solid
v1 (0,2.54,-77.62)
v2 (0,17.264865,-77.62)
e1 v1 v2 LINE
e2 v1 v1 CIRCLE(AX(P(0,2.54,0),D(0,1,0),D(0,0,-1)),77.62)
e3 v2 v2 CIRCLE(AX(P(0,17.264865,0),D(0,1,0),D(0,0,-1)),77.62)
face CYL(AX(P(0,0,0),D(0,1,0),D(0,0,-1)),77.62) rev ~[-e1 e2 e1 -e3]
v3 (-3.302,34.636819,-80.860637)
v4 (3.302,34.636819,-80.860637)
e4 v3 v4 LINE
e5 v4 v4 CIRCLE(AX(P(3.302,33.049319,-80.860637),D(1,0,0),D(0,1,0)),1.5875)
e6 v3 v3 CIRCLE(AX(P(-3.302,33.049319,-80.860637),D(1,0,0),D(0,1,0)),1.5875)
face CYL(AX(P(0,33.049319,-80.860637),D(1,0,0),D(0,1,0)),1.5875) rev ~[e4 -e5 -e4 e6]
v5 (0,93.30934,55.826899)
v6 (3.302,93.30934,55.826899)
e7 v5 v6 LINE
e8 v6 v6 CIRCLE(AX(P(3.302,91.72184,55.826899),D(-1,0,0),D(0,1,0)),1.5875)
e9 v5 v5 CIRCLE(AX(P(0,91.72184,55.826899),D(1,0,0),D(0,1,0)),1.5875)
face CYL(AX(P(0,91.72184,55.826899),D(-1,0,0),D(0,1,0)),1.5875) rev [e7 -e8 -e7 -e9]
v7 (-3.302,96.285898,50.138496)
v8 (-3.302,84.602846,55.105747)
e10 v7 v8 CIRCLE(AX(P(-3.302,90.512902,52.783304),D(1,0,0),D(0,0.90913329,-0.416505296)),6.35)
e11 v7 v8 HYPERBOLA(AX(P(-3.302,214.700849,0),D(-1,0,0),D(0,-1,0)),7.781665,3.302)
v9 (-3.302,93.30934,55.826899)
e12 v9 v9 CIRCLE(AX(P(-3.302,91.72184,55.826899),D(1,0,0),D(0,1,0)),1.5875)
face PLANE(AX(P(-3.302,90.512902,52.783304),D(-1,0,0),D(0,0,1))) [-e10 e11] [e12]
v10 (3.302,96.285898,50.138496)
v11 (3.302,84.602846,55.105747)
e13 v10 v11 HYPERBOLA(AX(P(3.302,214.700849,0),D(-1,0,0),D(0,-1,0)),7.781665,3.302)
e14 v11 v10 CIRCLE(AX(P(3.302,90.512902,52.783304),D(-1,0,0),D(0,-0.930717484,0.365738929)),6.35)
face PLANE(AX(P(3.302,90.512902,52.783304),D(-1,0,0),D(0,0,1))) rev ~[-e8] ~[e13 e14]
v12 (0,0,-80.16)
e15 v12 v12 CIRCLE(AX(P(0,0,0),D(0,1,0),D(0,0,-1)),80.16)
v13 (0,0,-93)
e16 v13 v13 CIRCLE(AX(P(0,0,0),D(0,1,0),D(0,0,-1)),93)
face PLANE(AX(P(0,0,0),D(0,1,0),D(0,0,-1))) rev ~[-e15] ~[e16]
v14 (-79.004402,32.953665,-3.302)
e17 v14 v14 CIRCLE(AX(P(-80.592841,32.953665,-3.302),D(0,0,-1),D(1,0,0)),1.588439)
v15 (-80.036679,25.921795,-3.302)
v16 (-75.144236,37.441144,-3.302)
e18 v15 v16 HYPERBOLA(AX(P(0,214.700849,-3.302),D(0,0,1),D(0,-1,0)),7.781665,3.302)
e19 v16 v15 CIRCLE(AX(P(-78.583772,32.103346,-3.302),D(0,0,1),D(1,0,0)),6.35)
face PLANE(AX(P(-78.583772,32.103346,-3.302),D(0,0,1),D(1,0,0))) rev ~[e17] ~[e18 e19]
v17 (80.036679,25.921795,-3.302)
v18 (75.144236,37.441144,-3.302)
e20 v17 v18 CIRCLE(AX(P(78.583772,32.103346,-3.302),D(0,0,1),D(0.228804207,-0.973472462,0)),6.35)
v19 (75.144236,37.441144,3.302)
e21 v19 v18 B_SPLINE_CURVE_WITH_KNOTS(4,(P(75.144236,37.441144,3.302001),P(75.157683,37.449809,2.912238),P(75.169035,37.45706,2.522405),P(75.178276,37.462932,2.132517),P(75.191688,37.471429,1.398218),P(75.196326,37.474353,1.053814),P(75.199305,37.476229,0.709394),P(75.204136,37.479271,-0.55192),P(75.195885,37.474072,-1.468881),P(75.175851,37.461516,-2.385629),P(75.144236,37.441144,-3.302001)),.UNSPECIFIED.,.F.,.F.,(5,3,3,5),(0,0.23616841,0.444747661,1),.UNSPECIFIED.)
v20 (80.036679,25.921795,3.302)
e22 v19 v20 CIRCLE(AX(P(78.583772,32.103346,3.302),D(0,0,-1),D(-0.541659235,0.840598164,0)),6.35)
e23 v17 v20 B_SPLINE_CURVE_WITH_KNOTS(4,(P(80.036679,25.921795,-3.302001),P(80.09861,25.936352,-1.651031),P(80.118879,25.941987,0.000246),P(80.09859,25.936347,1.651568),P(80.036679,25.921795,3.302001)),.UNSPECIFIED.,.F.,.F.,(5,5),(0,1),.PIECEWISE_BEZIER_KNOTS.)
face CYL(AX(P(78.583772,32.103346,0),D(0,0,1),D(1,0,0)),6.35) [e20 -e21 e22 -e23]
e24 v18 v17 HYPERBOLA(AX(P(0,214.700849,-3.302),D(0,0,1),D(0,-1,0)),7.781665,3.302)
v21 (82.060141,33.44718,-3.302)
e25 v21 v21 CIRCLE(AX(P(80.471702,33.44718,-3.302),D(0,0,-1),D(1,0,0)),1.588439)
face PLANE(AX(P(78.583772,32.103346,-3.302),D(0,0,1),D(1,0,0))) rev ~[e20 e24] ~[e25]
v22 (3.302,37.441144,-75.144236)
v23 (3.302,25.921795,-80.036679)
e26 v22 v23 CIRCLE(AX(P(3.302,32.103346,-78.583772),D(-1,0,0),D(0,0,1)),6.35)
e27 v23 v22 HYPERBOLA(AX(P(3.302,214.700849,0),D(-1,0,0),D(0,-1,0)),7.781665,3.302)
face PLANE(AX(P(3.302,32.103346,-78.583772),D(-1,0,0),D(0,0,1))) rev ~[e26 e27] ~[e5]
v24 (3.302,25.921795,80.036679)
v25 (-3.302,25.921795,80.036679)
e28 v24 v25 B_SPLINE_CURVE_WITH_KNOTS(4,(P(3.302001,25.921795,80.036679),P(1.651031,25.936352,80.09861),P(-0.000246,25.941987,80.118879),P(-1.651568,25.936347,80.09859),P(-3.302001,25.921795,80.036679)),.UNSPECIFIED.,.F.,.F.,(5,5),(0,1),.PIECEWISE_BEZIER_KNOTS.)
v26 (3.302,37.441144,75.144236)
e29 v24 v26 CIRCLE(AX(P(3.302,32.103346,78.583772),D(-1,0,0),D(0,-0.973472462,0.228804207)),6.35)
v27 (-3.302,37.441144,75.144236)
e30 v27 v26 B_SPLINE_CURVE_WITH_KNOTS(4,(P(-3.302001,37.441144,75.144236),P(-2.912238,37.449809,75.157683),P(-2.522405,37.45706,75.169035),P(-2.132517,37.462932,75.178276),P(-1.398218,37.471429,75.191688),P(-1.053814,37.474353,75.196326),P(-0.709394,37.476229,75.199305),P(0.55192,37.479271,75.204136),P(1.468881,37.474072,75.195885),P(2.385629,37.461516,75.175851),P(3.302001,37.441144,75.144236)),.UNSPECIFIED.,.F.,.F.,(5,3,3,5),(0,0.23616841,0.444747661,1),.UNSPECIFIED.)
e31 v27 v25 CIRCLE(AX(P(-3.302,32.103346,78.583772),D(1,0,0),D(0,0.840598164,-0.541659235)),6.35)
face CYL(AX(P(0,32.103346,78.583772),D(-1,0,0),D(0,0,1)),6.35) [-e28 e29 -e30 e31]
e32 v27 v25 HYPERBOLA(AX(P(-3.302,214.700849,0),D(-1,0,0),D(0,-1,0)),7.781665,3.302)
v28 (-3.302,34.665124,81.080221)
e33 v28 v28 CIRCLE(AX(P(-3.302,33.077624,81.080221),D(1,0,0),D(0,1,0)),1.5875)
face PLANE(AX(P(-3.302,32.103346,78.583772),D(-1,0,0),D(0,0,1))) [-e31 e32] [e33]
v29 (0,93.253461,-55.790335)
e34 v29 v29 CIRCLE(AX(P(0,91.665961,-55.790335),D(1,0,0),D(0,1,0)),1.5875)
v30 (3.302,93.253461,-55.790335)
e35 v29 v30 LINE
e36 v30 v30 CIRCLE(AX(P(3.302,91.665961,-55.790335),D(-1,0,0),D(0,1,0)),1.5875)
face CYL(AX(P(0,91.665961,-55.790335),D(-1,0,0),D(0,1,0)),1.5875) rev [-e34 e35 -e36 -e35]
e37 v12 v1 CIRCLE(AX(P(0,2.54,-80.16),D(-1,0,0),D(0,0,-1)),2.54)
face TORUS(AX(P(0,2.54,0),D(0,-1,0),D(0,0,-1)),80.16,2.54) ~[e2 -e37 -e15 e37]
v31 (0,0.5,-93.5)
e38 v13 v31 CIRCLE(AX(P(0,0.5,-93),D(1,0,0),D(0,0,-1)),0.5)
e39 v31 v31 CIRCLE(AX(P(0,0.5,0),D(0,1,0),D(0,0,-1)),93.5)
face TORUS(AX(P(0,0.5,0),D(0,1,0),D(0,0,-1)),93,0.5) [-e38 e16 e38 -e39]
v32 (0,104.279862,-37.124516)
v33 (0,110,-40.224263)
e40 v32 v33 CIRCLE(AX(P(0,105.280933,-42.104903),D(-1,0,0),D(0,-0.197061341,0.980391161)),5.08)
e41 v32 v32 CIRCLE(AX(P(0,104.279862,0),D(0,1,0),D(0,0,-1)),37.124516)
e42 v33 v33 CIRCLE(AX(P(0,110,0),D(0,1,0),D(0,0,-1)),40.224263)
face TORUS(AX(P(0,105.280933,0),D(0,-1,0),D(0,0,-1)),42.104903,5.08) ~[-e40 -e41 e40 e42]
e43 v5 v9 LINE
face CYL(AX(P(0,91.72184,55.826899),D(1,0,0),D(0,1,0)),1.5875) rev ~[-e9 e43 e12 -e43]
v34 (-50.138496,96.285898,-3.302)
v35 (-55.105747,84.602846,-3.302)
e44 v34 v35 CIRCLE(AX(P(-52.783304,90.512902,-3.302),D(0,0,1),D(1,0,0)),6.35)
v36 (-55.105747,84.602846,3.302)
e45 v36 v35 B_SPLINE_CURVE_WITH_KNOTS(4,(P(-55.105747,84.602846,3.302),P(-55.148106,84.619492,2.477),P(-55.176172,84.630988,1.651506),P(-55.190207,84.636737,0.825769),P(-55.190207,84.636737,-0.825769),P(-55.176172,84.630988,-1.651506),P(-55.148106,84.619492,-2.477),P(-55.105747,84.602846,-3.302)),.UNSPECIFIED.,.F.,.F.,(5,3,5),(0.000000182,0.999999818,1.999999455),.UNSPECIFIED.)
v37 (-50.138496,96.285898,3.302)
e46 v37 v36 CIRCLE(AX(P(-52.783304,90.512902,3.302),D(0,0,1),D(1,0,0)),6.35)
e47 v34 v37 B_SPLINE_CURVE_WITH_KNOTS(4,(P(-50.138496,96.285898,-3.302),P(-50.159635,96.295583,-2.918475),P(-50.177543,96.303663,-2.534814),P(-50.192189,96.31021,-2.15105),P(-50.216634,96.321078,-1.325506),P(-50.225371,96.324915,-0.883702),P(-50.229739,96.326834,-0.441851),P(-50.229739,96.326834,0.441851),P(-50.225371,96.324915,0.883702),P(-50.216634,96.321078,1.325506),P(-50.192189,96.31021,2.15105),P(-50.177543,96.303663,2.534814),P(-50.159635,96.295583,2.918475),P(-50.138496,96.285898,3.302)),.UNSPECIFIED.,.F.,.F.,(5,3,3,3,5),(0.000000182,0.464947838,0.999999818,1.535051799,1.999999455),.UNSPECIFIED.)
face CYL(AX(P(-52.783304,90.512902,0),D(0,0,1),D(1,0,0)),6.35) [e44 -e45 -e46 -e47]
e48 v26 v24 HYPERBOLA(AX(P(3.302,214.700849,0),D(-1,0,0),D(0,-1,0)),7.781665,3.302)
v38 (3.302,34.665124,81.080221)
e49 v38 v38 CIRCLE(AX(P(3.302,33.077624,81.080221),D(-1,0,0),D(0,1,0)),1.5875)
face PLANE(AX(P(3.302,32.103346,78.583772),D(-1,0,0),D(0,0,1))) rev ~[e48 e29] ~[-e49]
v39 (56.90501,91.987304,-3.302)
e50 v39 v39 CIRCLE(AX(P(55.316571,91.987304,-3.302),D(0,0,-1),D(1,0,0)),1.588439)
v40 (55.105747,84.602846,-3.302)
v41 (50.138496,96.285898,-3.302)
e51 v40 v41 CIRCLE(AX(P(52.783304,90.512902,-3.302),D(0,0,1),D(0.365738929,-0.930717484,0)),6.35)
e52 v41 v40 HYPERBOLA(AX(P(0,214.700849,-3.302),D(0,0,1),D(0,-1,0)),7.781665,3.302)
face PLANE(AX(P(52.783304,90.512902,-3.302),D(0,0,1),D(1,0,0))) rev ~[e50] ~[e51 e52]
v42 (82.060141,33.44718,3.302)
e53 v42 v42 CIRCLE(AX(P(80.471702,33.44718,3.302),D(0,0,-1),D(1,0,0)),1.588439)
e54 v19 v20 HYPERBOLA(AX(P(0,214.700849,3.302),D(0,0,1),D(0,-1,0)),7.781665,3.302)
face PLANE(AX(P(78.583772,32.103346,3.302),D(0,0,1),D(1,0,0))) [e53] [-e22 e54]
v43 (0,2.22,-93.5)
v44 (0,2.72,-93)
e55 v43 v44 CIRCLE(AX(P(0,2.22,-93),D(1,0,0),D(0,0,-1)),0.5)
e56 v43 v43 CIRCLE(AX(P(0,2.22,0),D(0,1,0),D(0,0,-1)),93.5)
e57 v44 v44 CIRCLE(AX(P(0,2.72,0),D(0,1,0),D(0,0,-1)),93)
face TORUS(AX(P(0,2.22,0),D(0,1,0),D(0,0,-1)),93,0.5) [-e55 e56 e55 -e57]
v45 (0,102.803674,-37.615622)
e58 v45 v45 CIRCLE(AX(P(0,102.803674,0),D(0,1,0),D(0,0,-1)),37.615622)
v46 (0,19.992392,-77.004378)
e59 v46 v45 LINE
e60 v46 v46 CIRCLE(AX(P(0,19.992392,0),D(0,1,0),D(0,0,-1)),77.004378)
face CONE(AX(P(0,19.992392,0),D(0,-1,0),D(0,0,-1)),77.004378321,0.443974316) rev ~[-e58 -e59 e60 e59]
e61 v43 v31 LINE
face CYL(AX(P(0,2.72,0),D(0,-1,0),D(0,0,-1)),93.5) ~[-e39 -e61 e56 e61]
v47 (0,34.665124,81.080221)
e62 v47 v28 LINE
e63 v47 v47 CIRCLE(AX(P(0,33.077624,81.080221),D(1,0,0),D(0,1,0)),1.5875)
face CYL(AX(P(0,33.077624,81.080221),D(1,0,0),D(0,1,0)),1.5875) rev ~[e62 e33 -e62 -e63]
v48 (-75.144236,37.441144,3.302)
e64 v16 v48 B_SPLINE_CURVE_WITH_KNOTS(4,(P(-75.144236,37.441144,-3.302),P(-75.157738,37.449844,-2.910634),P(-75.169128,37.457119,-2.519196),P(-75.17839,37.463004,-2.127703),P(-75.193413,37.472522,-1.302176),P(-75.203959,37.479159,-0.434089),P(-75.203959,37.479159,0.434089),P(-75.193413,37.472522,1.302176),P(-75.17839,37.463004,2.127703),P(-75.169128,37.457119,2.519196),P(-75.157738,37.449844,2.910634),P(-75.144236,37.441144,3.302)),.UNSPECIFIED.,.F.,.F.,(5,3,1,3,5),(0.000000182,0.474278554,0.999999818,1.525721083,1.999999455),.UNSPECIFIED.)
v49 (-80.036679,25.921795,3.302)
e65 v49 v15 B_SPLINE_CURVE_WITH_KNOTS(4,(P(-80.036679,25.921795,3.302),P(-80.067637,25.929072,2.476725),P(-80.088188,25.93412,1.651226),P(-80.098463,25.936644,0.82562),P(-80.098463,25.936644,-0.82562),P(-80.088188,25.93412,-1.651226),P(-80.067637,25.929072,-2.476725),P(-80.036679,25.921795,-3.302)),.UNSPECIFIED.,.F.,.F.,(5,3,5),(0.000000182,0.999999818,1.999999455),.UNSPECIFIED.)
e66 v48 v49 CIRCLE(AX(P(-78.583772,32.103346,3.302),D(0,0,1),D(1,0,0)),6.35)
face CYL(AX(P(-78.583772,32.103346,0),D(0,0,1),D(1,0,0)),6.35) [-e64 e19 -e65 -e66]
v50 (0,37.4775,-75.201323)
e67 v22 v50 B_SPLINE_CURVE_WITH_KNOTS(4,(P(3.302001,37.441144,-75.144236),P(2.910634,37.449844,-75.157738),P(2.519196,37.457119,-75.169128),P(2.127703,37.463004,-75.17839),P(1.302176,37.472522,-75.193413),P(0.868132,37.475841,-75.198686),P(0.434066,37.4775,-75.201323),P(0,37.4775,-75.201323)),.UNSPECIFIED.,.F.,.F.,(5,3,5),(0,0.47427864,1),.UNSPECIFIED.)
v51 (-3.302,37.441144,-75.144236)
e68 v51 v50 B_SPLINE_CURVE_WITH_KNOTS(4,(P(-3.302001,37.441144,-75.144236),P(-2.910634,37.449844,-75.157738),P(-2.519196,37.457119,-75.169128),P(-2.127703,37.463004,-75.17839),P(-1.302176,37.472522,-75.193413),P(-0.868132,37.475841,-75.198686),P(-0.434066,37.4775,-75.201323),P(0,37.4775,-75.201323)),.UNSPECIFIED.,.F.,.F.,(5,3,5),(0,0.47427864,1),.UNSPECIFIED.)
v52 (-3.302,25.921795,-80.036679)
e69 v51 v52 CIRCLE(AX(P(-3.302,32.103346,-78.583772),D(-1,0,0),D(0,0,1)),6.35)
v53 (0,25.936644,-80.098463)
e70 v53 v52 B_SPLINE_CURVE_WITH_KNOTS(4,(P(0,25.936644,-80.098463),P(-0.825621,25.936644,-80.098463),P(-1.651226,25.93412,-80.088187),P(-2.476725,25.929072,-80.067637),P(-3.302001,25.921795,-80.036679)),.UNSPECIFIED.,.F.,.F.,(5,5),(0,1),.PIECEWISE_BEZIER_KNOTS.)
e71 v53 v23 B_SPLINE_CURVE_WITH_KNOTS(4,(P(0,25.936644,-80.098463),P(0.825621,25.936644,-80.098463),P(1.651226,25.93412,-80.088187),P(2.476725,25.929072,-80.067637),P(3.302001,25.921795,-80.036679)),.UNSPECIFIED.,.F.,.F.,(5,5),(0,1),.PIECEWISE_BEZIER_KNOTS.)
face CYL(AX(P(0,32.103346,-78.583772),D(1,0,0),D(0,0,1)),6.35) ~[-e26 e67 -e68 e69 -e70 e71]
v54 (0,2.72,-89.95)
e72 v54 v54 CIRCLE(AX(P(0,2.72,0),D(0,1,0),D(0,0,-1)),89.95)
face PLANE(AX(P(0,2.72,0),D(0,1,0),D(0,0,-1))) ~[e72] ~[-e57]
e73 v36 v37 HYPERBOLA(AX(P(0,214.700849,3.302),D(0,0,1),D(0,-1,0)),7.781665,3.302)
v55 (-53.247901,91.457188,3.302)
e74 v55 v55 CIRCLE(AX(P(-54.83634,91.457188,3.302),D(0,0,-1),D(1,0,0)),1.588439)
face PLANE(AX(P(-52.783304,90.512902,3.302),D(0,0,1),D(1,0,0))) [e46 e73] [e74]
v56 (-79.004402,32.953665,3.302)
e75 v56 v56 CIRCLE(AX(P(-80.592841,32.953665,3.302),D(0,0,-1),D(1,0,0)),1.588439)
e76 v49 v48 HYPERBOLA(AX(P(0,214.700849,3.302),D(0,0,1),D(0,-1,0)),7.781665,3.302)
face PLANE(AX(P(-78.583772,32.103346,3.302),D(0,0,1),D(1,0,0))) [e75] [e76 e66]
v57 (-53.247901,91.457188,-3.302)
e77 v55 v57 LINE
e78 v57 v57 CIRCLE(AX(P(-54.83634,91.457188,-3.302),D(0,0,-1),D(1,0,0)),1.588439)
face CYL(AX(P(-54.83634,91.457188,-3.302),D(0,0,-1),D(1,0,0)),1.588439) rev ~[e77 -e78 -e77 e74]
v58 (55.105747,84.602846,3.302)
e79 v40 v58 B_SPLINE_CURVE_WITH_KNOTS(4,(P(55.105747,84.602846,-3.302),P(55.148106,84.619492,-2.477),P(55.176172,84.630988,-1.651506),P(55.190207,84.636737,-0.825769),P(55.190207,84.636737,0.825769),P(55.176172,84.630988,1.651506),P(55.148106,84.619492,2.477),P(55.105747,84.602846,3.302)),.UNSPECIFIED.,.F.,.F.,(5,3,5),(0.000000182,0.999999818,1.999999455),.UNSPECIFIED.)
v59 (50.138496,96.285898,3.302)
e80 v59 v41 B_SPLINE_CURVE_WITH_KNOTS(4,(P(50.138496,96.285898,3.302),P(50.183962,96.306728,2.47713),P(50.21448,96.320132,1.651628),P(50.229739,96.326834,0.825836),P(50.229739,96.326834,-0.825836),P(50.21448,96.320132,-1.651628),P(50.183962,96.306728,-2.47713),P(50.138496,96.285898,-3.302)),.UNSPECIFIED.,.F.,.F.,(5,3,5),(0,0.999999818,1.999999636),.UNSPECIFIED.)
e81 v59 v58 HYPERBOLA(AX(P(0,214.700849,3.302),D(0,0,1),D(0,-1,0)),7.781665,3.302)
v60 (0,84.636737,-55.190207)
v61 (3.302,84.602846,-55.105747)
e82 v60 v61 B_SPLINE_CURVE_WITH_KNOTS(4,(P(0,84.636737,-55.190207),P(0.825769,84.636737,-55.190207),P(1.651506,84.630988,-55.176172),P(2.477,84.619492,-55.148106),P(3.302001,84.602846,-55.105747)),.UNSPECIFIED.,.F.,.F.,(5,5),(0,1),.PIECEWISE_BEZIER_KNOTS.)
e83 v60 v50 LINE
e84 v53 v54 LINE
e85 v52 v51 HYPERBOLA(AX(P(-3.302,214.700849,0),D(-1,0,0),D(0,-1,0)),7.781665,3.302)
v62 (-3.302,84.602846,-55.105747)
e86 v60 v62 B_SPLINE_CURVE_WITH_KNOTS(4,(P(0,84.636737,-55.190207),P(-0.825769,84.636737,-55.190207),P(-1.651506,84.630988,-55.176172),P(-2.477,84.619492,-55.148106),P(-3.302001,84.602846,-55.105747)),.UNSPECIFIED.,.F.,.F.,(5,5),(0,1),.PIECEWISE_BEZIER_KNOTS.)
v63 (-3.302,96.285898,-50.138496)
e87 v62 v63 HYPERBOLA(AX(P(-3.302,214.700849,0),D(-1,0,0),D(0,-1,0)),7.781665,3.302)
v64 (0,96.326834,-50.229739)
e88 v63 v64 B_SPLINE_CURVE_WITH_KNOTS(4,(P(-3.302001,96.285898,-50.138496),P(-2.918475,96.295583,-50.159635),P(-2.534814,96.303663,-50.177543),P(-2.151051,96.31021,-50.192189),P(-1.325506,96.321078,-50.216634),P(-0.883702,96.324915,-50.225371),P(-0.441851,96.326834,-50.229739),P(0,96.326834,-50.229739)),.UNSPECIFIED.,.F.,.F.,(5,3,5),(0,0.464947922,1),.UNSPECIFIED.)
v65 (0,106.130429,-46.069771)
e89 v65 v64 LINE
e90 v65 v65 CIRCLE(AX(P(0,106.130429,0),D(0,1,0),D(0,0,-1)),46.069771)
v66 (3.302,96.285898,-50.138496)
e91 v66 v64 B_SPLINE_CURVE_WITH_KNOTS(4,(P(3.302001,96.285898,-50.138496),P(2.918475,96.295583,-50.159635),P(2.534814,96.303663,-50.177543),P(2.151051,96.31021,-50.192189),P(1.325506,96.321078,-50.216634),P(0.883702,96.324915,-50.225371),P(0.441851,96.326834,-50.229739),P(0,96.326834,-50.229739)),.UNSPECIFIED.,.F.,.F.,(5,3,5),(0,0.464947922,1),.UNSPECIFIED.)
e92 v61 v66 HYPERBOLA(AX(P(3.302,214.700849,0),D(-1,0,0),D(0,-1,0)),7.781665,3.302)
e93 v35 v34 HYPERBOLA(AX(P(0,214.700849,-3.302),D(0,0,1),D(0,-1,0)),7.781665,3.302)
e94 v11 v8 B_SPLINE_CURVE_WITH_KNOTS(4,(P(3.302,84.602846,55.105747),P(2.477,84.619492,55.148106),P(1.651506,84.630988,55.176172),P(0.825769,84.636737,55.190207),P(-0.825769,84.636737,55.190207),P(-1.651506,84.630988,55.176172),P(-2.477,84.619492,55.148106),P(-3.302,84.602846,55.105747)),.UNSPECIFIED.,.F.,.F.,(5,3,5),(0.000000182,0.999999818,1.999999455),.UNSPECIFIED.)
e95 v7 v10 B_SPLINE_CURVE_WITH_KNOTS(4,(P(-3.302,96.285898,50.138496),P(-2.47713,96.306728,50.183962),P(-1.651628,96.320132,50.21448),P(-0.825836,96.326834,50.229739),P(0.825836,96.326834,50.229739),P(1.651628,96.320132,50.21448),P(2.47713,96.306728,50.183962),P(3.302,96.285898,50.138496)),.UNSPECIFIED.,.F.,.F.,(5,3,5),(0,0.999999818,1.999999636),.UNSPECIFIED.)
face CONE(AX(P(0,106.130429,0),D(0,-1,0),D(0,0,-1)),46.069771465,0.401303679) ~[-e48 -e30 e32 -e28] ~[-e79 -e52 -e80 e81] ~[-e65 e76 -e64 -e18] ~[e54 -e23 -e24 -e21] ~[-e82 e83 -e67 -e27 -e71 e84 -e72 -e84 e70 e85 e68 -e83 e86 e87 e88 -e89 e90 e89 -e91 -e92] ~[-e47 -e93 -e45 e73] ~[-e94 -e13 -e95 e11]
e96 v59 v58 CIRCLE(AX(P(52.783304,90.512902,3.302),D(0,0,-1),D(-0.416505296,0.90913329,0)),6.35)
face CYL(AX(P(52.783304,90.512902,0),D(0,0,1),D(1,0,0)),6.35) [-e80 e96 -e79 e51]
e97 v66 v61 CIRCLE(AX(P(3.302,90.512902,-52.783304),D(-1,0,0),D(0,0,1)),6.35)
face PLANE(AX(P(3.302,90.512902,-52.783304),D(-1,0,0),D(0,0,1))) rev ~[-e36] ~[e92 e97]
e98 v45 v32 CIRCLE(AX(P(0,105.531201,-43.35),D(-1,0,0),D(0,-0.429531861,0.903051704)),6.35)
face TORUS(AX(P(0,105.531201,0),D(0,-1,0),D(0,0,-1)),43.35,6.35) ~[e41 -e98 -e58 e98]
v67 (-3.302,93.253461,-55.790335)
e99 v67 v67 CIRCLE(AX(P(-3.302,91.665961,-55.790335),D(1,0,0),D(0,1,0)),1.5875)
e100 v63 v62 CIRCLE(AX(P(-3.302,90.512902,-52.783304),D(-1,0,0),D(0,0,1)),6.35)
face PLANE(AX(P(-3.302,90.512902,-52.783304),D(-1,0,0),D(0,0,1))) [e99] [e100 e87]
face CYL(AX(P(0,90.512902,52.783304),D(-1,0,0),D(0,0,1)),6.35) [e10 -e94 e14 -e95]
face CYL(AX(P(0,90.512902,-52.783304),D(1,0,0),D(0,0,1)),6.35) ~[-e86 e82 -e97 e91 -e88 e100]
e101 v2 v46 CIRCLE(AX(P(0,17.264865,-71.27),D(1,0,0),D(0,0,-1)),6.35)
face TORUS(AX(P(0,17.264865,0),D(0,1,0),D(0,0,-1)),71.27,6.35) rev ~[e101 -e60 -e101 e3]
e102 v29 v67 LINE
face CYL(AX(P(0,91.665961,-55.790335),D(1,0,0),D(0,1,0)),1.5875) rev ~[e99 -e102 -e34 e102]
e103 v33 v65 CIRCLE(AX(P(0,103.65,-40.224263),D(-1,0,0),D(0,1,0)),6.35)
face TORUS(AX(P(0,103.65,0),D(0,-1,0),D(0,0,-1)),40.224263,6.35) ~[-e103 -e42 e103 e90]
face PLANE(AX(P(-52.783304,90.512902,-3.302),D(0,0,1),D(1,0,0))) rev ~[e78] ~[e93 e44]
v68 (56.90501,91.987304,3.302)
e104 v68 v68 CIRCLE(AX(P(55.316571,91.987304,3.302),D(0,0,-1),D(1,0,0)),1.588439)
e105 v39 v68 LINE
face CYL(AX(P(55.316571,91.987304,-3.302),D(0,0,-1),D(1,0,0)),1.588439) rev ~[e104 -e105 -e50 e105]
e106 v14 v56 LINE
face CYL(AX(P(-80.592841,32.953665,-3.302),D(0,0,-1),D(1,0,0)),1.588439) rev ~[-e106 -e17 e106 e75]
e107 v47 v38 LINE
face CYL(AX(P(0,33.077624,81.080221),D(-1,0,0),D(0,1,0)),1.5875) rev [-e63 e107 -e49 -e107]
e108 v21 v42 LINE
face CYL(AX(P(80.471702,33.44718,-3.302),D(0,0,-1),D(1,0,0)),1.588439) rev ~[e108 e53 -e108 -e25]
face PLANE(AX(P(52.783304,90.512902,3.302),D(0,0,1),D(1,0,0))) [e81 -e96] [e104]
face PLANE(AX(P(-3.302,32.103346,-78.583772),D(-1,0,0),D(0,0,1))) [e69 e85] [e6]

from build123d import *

# Parameters (mm, degrees)
F4_R      = 2.54
F5_R      = 0.5
F6_R      = 6.35
F7_DEPTH  = 3.302
F8_ANGLE  = -90
F9_DEPTH  = 3.302
F10_R     = 1.5884390158
F11_DEPTH = 12.7
F12_R     = 1.5875
F13_DEPTH = 12.7


# Not quite as in the source:
# - a fillet or chamfer that OpenCascade refuses, or shapes differently, is made with other operations: its cross-section is extruded or revolved along the edge and cut away or added


with BuildPart() as f2:
    # F1 (on Top) → F2 (revolve)
    with BuildSketch(Plane.XY):
        with BuildLine():
            Line((-93.5, 0), (-77.62, 0))
            Line((-77.62, 0), (-77.62, 17.2648650431))
            ThreePointArc((-77.62, 17.2648650431), (-77.4641828492, 18.6629347231), (-77.0043783212, 19.9923923608))
            Line((-77.0043783212, 19.9923923608), (-37.6156216788, 102.8036737445))
            ThreePointArc((-37.6156216788, 102.8036737445), (-37.1558171508, 104.1331313823), (-37, 105.5312010623))
            Line((-37, 105.5312010623), (-37, 110))
            Line((-37, 110), (-40.2242628687, 110))
            ThreePointArc((-40.2242628687, 110), (-43.7293858539, 108.9449610818), (-46.0697714652, 106.1304292467))
            Line((-46.0697714652, 106.1304292467), (-89.95, 2.72))
            Line((-89.95, 2.72), (-93.5, 2.72))
            Line((-93.5, 2.72), (-93.5, 0))
        make_face()
    revolve(axis=Axis((0, 28.3275991678, 0), (0, 1, 0)))

    # F3: fillet of radius 5.08 on 1 edges, made by hand

    # F3_s1 → F3_t2 (revolve, cut)
    with BuildSketch(Plane.XY):
        with BuildLine():
            ThreePointArc((-37.1245161297, 104.2798615477), (-37.6385377676, 107.7012594993), (-40.2242628687, 110))
            Line((-40.2242628687, 110), (-40.0361988329, 110.4719066841))
            ThreePointArc((-40.0361988329, 110.4719066841), (-38.6121314343, 110.508), (-37, 110.508))
            Line((-37, 110.508), (-36.492, 110))
            ThreePointArc((-36.492, 110), (-36.492, 105.5312010623), (-36.6264774201, 104.1797543865))
            Line((-36.6264774201, 104.1797543865), (-37.1245161297, 104.2798615477))
        make_face()
    revolve(axis=Axis((0, 110, 0), (0, 1, 0)), mode=Mode.SUBTRACT)

    # F4
    f4_edges = [f2.edges().sort_by_distance(p)[0] for p in [
        (77.62, 0, 0),
    ]]
    fillet(f4_edges, radius=F4_R)

    # F5
    f5_edges = [f2.edges().sort_by_distance(p)[0] for p in [
        (93.5, 2.72, 0),
        (93.5, 0, 0),
    ]]
    fillet(f5_edges, radius=F5_R)

    # F6 (on Top) → F7 (join, symmetric)
    with BuildSketch(Plane.XY):
        with Locations((-78.5837723943, 32.1033455817)):
            Circle(F6_R)
        with Locations((-52.7833043417, 90.5129020759)):
            Circle(F6_R)
        with Locations((52.7833043417, 90.5129020759)):
            Circle(F6_R)
        with Locations((78.5837723943, 32.1033455817)):
            Circle(F6_R)
    extrude(amount=F7_DEPTH, both=True)


with BuildPart() as f2_1:
    # F8: moved
    add(f2.part.rotate(Axis((0, 28.3275991678, 0), (0, 1, 0)), F8_ANGLE))

    # F6 (on Top) → F9 (join, symmetric)
    with BuildSketch(Plane.XY):
        with Locations((-78.5837723943, 32.1033455817)):
            Circle(F6_R)
        with Locations((-52.7833043417, 90.5129020759)):
            Circle(F6_R)
        with Locations((52.7833043417, 90.5129020759)):
            Circle(F6_R)
        with Locations((78.5837723943, 32.1033455817)):
            Circle(F6_R)
    extrude(amount=F9_DEPTH, both=True)

    # F10 (on face) → F11 (cut, symmetric)
    with BuildSketch(Plane(origin=(0, 0, -3.302), x_dir=(1, 0, 0), z_dir=(0, 0, -1))):
        with Locations((55.3165711462, -91.9873043895)):
            Circle(F10_R)
        with Locations((80.47170192, -33.4471799433)):
            Circle(F10_R)
        with Locations((-80.59284091, -32.9536646605)):
            Circle(F10_R)
        with Locations((-54.8363402486, -91.4571881294)):
            Circle(F10_R)
    extrude(amount=F11_DEPTH, both=True, mode=Mode.SUBTRACT)

    # F12 (on Right) → F13 (cut, symmetric)
    with BuildSketch(Plane.YZ):
        with Locations((33.0776236951, 81.0802206397)):
            Circle(F12_R)
        with Locations((91.7218402028, 55.8268986642)):
            Circle(F12_R)
        with Locations((91.6659608483, -55.79033494)):
            Circle(F12_R)
        with Locations((33.0493189394, -80.8606371284)):
            Circle(F12_R)
    extrude(amount=F13_DEPTH, both=True, mode=Mode.SUBTRACT)


solid = f2_1.part
